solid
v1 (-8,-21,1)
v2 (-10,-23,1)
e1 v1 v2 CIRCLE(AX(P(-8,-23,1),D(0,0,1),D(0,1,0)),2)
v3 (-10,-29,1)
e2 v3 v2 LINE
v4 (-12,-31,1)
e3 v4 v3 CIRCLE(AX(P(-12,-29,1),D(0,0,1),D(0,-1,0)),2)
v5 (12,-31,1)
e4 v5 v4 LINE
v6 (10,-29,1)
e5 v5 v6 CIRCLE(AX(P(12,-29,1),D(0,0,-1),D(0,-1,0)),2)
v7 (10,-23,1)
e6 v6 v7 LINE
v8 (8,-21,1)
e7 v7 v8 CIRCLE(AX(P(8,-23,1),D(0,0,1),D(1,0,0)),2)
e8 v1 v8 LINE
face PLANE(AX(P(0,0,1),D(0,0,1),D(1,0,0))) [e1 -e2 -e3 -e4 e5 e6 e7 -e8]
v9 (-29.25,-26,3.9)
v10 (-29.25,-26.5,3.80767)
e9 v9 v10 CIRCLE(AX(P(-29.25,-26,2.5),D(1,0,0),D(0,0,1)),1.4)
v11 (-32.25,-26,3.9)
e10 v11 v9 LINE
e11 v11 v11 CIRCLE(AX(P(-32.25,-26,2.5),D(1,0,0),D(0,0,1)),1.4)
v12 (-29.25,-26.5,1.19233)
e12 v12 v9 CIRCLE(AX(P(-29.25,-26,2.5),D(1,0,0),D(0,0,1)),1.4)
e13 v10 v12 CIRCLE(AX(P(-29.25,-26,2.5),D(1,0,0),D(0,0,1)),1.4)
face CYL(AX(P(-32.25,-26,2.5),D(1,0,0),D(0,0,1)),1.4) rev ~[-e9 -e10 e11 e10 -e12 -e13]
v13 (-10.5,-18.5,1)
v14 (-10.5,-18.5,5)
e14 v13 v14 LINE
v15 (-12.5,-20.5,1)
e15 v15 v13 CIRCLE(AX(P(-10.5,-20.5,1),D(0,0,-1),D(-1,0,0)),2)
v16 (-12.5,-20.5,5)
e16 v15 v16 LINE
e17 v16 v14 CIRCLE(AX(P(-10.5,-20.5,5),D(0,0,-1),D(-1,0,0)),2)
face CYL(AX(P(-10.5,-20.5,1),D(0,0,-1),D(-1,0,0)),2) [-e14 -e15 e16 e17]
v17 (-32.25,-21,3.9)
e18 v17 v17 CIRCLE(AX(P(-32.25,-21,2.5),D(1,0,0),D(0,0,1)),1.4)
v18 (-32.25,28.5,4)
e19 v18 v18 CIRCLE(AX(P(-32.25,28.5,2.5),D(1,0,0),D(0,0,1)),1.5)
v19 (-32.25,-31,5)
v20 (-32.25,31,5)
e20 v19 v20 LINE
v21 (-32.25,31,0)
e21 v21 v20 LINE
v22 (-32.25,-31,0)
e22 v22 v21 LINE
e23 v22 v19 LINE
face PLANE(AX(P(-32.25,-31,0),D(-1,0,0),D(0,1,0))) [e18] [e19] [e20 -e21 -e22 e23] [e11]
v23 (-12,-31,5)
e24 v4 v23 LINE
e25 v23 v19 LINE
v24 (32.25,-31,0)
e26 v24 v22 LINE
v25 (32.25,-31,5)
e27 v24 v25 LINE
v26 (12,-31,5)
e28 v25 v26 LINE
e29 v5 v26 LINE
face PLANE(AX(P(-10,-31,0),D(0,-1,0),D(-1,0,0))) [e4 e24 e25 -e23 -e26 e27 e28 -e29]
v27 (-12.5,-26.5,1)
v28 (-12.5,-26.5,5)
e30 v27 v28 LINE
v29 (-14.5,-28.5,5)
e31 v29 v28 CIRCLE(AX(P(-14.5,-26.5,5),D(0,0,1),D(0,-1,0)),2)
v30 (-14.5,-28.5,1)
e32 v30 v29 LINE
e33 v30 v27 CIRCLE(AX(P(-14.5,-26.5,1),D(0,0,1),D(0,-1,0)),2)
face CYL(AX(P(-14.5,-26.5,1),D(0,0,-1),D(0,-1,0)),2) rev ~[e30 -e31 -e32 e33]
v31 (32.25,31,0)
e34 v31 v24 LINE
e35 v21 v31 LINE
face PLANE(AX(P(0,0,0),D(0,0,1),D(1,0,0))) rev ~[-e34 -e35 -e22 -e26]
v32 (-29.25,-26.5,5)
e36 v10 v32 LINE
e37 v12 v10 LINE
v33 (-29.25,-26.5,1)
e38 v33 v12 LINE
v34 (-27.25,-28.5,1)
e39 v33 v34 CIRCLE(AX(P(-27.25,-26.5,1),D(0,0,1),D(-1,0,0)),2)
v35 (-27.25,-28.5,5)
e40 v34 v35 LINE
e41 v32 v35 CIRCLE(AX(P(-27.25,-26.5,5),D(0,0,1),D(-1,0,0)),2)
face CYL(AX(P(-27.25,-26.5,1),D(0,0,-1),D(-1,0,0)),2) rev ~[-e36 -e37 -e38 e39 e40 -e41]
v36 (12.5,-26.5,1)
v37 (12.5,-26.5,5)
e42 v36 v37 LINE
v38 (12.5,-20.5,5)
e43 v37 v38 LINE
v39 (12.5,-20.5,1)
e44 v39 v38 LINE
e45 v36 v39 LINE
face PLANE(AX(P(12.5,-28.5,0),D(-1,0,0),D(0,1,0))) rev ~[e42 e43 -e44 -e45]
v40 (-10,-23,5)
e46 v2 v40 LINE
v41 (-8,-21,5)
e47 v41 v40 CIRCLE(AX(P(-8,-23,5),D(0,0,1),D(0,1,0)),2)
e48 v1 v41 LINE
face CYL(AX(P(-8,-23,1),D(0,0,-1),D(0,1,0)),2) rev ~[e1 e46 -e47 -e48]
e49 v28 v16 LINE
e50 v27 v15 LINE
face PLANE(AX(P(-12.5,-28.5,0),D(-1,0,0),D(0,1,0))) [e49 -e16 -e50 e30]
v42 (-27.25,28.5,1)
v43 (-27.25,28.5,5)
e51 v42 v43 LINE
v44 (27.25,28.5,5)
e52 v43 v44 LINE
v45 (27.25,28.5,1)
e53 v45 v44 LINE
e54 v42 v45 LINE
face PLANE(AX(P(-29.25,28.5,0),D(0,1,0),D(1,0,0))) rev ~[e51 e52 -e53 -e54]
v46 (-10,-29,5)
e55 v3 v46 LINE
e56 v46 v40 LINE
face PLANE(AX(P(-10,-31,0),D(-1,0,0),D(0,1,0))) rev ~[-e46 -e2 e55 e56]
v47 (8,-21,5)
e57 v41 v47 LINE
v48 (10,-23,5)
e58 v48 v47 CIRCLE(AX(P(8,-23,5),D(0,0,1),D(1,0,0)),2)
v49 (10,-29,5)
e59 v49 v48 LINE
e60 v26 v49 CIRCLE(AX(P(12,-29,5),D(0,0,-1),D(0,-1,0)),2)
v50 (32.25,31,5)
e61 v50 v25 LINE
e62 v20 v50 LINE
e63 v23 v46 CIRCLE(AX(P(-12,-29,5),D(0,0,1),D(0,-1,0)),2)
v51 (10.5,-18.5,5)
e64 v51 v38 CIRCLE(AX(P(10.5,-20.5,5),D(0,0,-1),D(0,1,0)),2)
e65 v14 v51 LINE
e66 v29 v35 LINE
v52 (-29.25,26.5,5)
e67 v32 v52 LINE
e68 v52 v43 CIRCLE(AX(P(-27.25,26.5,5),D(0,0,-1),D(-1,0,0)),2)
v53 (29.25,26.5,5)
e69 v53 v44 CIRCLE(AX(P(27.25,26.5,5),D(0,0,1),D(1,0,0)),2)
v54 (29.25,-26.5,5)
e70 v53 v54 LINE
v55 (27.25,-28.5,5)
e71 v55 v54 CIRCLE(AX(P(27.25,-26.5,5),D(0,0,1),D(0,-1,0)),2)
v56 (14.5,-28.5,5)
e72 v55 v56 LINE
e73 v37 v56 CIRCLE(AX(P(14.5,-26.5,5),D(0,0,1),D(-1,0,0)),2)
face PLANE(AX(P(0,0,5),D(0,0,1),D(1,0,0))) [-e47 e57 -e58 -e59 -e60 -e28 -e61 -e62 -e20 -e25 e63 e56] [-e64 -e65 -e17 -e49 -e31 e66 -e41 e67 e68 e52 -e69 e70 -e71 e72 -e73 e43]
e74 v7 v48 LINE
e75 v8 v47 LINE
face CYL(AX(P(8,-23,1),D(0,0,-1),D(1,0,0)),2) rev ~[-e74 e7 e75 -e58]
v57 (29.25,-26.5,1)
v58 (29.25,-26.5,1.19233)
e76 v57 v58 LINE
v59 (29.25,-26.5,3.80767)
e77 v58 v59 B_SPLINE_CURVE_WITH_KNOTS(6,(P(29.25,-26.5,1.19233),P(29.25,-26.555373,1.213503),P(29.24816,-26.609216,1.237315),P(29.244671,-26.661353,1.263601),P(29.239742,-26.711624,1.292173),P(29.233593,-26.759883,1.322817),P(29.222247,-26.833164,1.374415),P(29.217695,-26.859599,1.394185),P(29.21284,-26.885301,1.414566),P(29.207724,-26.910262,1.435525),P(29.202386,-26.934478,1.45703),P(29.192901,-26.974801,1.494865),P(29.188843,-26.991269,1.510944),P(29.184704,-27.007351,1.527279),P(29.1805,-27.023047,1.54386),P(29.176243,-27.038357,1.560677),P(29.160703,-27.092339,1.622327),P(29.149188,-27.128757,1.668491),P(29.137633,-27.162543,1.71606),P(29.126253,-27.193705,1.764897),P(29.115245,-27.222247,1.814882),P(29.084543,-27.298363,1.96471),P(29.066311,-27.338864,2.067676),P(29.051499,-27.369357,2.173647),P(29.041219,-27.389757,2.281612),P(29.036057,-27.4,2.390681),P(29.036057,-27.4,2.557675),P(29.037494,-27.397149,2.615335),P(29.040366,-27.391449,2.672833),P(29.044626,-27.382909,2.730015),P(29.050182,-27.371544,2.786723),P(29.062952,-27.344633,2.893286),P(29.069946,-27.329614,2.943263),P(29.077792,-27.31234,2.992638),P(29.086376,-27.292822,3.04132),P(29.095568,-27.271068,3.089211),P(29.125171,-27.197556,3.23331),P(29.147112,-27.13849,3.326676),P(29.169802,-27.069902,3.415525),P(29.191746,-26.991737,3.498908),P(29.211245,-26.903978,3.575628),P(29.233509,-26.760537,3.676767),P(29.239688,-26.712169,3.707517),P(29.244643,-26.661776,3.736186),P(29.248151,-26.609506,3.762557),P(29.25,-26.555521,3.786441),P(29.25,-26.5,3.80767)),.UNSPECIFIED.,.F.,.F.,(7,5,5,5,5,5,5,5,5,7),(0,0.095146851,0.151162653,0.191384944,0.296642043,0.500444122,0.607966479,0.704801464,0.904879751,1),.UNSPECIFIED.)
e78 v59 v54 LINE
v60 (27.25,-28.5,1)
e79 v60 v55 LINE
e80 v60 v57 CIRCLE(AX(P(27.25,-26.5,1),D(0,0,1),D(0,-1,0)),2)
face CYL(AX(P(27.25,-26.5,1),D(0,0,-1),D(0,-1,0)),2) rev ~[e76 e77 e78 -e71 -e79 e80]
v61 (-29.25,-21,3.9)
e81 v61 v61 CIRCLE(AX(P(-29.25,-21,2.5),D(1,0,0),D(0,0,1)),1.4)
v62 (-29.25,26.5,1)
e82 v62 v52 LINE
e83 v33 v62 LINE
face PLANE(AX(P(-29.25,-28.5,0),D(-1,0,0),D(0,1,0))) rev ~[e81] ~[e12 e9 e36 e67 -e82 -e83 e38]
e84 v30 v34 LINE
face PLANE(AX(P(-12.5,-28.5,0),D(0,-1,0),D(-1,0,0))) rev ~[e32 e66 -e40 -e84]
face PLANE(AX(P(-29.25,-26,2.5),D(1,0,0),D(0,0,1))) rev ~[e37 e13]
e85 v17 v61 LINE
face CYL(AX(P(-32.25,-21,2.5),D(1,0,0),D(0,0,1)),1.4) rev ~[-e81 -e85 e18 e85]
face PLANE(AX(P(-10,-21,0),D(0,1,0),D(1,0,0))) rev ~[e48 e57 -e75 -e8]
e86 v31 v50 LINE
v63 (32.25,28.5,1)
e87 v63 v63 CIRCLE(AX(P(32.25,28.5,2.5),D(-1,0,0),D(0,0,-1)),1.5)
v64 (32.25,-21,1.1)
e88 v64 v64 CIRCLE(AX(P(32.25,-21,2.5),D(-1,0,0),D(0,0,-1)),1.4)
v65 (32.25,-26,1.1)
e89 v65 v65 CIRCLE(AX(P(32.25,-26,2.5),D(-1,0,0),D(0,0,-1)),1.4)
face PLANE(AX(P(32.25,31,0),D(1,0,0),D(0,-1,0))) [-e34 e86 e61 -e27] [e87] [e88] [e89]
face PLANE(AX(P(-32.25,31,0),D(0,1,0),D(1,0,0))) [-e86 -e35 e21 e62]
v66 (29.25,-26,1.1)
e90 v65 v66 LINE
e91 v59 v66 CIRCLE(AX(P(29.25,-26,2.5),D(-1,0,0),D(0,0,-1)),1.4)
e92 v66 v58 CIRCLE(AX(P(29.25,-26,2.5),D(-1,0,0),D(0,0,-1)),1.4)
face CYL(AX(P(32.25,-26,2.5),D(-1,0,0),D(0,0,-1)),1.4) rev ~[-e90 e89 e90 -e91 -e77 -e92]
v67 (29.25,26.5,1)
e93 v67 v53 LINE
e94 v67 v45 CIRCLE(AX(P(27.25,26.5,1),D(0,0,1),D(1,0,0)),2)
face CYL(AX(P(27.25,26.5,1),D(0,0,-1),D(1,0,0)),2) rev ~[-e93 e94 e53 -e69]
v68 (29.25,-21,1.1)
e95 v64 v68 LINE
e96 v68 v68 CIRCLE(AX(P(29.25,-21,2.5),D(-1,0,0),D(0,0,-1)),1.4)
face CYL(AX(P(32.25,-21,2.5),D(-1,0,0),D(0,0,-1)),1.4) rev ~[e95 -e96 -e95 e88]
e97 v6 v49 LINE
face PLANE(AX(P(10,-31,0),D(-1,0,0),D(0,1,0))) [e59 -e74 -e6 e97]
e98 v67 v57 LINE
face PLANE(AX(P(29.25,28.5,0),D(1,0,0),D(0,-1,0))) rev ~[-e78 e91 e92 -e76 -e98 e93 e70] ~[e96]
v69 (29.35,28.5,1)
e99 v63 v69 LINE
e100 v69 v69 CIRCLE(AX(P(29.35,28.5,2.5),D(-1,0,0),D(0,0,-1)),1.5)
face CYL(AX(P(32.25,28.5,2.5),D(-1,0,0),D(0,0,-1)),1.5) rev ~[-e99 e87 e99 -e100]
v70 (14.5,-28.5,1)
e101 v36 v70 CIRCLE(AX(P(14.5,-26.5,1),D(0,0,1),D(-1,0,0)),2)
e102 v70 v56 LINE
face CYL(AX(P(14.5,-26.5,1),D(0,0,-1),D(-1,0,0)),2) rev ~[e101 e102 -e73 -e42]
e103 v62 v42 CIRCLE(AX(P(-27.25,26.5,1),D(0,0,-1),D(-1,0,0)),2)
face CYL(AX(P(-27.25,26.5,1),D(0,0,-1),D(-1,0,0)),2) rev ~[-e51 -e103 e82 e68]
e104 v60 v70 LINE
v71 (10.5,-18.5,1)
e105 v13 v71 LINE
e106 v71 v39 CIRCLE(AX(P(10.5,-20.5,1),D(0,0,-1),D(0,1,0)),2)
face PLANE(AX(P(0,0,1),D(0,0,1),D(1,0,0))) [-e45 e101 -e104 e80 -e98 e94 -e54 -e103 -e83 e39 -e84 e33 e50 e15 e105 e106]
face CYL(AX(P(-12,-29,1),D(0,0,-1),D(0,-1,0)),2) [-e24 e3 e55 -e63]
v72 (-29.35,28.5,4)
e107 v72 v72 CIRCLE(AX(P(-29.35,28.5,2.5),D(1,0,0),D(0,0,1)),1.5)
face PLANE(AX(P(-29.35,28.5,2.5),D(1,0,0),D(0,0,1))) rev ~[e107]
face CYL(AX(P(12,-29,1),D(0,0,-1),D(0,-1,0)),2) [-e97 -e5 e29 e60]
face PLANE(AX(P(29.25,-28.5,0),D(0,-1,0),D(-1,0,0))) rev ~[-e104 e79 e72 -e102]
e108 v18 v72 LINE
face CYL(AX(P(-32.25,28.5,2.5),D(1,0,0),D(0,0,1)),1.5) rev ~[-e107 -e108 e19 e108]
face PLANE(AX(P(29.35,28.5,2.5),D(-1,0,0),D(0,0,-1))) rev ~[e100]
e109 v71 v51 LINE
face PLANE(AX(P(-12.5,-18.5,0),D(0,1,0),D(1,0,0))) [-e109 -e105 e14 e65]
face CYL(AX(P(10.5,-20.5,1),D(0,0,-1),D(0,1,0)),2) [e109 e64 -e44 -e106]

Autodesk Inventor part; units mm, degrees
ref_plane "YZ Plane" through (0, 0, 0) normal (1, 0, 0) x (0, 1, 0)
ref_plane "XZ Plane" through (0, 0, 0) normal (0, 1, 0) x (-1, 0, 0)
ref_plane "XY Plane" through (0, 0, 0) normal (0, 0, 1) x (1, 0, 0)
sketch "スケッチ1" plane through (0, 0, 0) normal (0, 0, 1) x (1, 0, 0)
  line L0 (-32.25, 31) -> (32.25, 31)
  line L1 (32.25, 31) -> (32.25, -31)
  line L2 (32.25, -31) -> (10, -31)
  line L3 (-32.25, -31) -> (-32.25, 31)
  line L4 (-32.25, 31) -> (32.25, -31) construction
  line L5 (32.25, 31) -> (-32.25, -31) construction
  line L6 (-29.25, 28.5) -> (29.25, 28.5)
  line L7 (29.25, 28.5) -> (29.25, -28.5)
  line L8 (29.25, -28.5) -> (12.5, -28.5)
  line L9 (-29.25, -28.5) -> (-29.25, 28.5)
  line L10 (-29.25, 28.5) -> (29.25, -28.5) construction
  line L11 (29.25, 28.5) -> (-29.25, -28.5) construction
  line L12 (0, 31) -> (0, -28.25) construction
  line L13 (-10, -31) -> (-10, -21)
  line L14 (-10, -21) -> (10, -21)
  line L15 (10, -31) -> (10, -21)
  line L16 (-12.5, -28.5) -> (-12.5, -18.5)
  line L17 (-12.5, -18.5) -> (12.5, -18.5)
  line L18 (12.5, -28.5) -> (12.5, -18.5)
  line L19 (-12.5, -28.5) -> (-29.25, -28.5)
  line L20 (-10, -31) -> (-32.25, -31)
  line L21 (-10, -31) -> (10, -31)
  point P0 (0, 0)
  point P1 (10, -25.75)
  point P2 (10, -28.25)
  point P3 (-10, -25.75)
  dimension "d0" = 64.5
  dimension "d1" = 62
  dimension "d2" = 3
  dimension "d3" = 2.5
  dimension "d40" = 20
  dimension "d41" = 10
  dimension "d42" = 2.5
  dimension "d43" = 2.5
extrude "押し出し1" add sketch "スケッチ1" along normal blind 5 contours L0 L1 L2 L15 L14 L13 L20 L3
extrude "押し出し2" add sketch "スケッチ1" along normal blind 1 contours L13 L14 L15 L21 | L6 L7 L8 L18 L17 L16 L19 L9
sketch "スケッチ2" plane through (32.25, -31, 0) normal (1, 0, 0) x (0, 0, -1)
  line L0 (0, 0) -> (-5, 0) projected
  line L1 (0, 62) -> (-5, 62) projected
  line L2 (-2.5, 62) -> (-2.5, 0) construction
  point P0 (0, 31)
  point P1 (-2.5, 59.5)
  point P2 (-2.5, 5)
  point P3 (-2.5, 10)
  dimension "d8" = 5
  dimension "d9" = 5
  dimension "d10" = 2.5
hole "穴1" at (32.25, 28.5, 2.5) direction (-1, 0, 0) diameter 3 depth 2.9
hole "穴2" at (32.25, -21, 2.5) at (32.25, -26, 2.5) direction (-1, 0, 0) diameter 2.8 depth 3
fillet "フィレット1" radius 2 12 edges at (-29.25, 28.5, 3) (29.25, -28.5, 3) (29.25, 28.5, 3) (-12.5, -28.5, 3) (-29.25, -28.5, 3) (12.5, -28.5, 3) (10, -21, 3) (-10, -21, 3) (-12.5, -18.5, 3) (12.5, -18.5, 3) (-10, -31, 3) (10, -31, 3)
sketch "スケッチ3" plane through (-32.25, -31, 0) normal (-1, 0, 0) x (0, 0, 1)
  circle A0 centre (2.5, 59.5) radius 1.5 projected
  arc A1 (3.8077, 4.5) -> (1.1923, 4.5) centre (2.5, 5) ccw projected
  circle A2 centre (2.5, 10) radius 1.4 projected
  point P0 (0, 31)
  point P1 (2.5, 5)
  point P2 (2.5, 10)
hole "穴3" at (-32.25, 28.5, 2.5) direction (1, 0, 0) diameter 3 depth 2.9
hole "穴4" at (-32.25, -26, 2.5) at (-32.25, -21, 2.5) direction (1, 0, 0) diameter 2.8 depth 3
equation "\"d43\" = d42"
properties part number "Cockpit_upper_back_door" material "アセタール樹脂、黒"
